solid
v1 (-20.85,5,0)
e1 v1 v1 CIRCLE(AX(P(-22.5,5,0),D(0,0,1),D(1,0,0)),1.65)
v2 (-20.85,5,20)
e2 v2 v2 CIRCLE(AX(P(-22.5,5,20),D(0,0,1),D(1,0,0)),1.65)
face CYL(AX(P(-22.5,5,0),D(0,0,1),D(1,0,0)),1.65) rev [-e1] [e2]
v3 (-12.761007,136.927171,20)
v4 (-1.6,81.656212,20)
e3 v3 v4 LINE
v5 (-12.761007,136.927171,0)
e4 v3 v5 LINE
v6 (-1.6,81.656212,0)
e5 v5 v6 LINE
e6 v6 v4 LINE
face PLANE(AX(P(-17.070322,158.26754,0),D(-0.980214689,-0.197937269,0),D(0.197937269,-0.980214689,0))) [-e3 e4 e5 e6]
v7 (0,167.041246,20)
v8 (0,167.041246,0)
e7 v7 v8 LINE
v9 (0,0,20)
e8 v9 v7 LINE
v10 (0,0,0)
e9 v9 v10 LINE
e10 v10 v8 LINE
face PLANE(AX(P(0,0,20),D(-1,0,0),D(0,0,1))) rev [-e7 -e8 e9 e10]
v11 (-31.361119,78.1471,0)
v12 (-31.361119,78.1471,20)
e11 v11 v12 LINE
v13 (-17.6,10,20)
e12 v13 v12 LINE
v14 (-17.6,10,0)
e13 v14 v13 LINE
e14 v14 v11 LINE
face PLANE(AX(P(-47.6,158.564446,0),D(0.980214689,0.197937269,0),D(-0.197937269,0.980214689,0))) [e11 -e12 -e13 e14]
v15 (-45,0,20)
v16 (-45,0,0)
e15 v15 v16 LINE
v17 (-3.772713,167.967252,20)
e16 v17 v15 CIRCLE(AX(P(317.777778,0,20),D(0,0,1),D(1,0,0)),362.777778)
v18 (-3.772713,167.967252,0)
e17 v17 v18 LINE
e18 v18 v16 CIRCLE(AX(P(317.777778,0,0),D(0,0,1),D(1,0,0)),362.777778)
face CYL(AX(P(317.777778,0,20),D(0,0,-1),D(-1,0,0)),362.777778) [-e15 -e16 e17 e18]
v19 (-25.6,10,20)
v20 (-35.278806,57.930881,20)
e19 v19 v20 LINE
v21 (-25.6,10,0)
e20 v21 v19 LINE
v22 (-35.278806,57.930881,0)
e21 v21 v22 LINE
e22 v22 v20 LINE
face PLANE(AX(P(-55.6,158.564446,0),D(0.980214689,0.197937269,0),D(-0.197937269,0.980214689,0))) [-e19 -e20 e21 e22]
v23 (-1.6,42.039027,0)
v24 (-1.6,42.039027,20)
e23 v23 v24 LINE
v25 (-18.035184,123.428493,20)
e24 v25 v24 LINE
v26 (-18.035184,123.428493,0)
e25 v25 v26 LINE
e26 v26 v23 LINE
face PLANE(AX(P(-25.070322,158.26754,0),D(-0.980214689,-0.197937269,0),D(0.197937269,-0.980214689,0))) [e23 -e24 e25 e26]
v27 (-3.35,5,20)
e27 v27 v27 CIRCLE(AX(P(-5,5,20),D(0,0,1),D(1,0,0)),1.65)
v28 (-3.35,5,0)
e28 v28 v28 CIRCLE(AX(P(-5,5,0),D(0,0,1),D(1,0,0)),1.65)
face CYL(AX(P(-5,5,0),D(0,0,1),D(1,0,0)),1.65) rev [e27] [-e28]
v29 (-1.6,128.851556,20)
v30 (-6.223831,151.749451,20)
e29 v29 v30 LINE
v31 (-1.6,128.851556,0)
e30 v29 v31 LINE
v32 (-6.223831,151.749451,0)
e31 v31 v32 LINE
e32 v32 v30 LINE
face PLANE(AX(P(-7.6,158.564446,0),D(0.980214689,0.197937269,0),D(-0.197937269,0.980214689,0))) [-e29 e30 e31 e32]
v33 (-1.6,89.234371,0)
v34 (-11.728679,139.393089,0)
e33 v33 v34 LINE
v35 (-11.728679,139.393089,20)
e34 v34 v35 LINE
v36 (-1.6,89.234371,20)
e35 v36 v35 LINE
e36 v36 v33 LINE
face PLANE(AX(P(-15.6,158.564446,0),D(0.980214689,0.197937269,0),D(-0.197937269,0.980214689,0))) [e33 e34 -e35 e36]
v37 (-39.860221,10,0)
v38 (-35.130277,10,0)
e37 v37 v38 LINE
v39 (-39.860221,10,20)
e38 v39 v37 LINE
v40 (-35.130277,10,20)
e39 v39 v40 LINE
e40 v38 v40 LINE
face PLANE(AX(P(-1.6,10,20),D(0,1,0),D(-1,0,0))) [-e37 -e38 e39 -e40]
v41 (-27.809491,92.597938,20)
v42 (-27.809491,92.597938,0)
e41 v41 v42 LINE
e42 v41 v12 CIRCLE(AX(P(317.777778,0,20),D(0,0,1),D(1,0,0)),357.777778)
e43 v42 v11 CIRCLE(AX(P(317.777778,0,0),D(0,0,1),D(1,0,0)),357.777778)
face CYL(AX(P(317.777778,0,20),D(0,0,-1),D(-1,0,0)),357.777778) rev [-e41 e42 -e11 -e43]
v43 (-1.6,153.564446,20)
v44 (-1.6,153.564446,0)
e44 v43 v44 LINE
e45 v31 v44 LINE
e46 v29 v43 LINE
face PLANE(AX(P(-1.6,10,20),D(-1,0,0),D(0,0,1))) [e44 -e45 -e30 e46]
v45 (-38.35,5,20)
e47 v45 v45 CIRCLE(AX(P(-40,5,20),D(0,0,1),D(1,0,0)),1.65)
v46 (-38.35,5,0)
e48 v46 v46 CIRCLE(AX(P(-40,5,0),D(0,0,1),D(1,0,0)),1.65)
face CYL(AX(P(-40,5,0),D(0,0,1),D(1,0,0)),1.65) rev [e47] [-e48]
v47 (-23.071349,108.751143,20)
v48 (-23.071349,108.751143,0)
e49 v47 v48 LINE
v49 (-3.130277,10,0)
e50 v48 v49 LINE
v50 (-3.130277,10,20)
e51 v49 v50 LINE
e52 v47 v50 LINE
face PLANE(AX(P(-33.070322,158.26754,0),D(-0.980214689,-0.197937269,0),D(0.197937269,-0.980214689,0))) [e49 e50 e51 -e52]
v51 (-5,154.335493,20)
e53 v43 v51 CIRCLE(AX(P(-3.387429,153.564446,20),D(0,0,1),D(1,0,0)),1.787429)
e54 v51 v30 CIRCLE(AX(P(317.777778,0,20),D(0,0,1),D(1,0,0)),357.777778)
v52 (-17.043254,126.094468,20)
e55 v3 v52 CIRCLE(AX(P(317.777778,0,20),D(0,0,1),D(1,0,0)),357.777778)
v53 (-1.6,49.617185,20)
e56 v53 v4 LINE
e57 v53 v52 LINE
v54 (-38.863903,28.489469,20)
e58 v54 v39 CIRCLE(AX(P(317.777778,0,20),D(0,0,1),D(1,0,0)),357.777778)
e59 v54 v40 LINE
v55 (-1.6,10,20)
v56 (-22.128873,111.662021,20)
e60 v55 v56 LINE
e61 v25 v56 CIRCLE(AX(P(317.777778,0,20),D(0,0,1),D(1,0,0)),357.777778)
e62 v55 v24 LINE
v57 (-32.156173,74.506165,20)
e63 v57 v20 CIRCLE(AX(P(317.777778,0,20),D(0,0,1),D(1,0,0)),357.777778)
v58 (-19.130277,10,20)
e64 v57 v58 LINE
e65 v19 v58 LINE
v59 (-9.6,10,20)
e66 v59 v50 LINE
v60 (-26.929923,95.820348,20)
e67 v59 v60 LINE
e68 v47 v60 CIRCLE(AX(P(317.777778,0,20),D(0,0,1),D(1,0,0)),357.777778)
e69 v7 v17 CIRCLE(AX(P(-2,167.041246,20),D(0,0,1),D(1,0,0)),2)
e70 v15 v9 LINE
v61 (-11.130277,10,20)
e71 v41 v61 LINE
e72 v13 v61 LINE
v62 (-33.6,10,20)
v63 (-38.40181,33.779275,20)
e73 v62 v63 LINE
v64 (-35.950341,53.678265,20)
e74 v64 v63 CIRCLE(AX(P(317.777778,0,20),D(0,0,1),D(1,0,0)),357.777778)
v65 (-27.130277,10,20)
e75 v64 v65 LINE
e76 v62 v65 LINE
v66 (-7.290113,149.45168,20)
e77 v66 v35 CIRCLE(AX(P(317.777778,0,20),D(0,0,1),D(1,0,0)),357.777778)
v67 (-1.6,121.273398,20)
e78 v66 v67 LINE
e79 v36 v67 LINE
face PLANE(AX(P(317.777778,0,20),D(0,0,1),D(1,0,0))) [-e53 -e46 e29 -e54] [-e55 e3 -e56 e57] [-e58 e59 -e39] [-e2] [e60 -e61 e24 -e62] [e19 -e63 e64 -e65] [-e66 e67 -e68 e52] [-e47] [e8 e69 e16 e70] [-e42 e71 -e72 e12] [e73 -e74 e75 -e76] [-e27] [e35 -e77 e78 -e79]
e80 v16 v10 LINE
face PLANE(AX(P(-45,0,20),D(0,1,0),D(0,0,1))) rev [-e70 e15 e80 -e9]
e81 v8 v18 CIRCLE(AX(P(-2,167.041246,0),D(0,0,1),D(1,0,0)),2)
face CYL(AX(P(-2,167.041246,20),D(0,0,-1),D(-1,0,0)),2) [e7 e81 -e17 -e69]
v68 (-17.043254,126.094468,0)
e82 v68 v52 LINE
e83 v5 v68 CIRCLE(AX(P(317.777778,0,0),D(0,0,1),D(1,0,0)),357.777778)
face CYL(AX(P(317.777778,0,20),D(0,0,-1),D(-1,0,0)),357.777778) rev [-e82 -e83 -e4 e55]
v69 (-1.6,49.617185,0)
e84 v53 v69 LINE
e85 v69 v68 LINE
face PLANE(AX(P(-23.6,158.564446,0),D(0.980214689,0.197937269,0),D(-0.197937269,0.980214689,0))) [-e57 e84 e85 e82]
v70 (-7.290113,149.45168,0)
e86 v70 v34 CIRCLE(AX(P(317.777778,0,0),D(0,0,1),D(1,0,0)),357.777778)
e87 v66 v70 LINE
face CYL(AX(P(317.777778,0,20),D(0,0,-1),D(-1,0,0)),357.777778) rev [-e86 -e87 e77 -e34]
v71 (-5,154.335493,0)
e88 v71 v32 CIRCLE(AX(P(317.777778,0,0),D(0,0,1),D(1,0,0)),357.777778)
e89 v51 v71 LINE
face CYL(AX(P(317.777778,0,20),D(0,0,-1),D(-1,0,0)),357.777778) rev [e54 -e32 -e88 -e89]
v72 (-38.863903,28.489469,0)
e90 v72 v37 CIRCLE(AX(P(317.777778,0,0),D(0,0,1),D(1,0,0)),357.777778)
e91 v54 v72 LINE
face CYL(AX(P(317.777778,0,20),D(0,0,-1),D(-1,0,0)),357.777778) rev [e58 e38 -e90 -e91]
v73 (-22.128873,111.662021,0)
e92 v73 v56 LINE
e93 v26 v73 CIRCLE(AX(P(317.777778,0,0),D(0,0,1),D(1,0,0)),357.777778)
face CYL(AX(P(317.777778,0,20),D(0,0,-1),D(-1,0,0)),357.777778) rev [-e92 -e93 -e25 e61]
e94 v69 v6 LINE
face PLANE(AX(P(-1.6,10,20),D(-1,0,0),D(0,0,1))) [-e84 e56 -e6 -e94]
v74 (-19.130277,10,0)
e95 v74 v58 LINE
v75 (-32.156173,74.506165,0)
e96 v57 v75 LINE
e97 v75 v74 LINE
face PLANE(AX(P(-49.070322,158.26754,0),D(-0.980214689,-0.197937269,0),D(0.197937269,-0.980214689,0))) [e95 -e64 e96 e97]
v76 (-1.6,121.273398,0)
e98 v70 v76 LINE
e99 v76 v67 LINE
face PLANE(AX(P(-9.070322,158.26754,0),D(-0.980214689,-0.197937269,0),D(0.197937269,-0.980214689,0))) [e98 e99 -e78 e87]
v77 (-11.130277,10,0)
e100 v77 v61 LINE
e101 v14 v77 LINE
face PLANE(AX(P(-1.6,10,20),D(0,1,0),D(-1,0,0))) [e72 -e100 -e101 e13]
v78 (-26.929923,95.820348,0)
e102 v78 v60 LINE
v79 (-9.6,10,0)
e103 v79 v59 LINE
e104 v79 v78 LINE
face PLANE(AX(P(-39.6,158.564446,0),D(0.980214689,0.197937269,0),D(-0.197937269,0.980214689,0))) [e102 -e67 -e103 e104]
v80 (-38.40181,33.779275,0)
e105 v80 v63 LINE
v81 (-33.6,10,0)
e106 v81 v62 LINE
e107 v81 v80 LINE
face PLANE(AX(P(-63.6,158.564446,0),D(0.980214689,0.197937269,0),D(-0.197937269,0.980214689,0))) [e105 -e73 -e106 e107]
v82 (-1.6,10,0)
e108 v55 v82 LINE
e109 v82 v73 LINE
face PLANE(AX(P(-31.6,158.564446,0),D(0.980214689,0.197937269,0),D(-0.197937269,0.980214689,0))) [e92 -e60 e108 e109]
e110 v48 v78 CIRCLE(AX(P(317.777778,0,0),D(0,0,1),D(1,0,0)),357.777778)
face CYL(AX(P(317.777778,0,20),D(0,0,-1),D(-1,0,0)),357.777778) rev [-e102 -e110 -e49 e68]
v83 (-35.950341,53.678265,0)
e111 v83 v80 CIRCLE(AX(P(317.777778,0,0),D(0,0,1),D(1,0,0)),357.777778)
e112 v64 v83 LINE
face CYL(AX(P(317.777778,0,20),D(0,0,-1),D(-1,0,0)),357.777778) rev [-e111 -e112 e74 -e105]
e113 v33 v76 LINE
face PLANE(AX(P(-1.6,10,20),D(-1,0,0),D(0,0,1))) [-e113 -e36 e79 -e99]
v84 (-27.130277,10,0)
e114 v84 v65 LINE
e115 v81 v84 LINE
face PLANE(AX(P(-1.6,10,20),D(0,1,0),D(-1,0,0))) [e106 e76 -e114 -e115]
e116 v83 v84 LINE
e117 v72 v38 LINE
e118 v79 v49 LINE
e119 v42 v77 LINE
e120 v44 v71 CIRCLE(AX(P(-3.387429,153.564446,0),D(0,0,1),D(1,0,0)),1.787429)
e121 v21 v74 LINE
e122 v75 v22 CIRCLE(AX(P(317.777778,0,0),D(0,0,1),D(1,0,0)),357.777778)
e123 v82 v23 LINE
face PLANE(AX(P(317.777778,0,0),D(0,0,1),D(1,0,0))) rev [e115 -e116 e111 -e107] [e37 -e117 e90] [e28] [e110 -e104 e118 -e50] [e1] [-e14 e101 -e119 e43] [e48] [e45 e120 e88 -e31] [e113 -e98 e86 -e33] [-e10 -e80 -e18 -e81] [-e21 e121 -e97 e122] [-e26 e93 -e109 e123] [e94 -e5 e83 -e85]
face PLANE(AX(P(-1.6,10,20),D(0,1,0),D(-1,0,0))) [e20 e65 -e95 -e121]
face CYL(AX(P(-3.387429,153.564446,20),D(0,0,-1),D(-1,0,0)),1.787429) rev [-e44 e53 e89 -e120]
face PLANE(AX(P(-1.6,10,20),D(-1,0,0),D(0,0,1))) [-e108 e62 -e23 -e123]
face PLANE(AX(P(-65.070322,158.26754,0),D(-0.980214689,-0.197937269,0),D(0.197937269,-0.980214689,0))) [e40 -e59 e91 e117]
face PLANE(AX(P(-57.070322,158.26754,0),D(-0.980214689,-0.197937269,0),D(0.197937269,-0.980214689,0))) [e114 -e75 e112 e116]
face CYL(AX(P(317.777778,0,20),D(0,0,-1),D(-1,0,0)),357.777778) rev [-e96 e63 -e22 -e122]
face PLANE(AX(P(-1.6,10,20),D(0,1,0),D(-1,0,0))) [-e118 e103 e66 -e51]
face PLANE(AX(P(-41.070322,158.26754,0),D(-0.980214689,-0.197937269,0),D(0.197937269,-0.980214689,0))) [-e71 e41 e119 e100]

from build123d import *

# Parameters (mm, degrees)
BOSS_EXTRUDE4_DEPTH = 20
SKETCH12_R          = 1.65
CUT_EXTRUDE1_DEPTH  = 177.068006068
BOSS_EXTRUDE5_DEPTH = 20
CUT_EXTRUDE2_START  = -20
CUT_EXTRUDE2_DEPTH  = 20
LPATTERN2_DEPTH     = 20
CUT_EXTRUDE4_START  = -30
CUT_EXTRUDE4_DEPTH  = 30


with BuildPart() as part:
    # Sketch5 → Boss-Extrude4 (new body)
    with BuildSketch(Plane.XY):
        with BuildLine():
            Line((0, 0), (0, 167.041245738))
            ThreePointArc((0, 167.041245738), (-1.523254023, 168.9835931), (-3.772713274, 167.967252028))
            ThreePointArc((-3.772713274, 167.967252028), (-34.542452011, 86.476422979), (-45, 0))
            Line((-45, 0), (0, 0))
        make_face()
        with BuildLine():
            Line((-1.6, 10), (-39.860221142, 10))
            ThreePointArc((-39.860221142, 10), (-30.000299364, 83.996114978), (-5, 154.335493145))
            ThreePointArc((-5, 154.335493145), (-2.992115624, 155.307611869), (-1.6, 153.56444562))
            Line((-1.6, 153.56444562), (-1.6, 10))
        make_face(mode=Mode.SUBTRACT)
    extrude(amount=BOSS_EXTRUDE4_DEPTH)

    # Sketch12 → Cut-Extrude1 (cut, through all)
    with BuildSketch(Plane.XY.offset(20)):
        with Locations((-40, 5)):
            Circle(SKETCH12_R)
        with Locations((-22.5, 5)):
            Circle(SKETCH12_R)
        with Locations((-5, 5)):
            Circle(SKETCH12_R)
    extrude(amount=-CUT_EXTRUDE1_DEPTH, mode=Mode.SUBTRACT)

    # Sketch14 → Boss-Extrude5 (add)
    with BuildSketch(Plane.XY.offset(20)):
        Polygon((-31.6, 158.56444562), (-1.6, 10), (-3.070322034, 9.703094096), (-33.070322034, 158.267539717), align=None)
    extrude(amount=-BOSS_EXTRUDE5_DEPTH)

    # Sketch17 → Cut-Extrude2 (cut)
    with BuildSketch(Plane.XY.offset(20).offset(CUT_EXTRUDE2_START)):
        Polygon((-120.638203698, 868.825955305), (-109.129206393, -31.174044695), (790.870793607, -19.66504739), (784.13367644, 507.175413991), align=None)
        with BuildLine():
            Line((-45, 0), (0, 0))
            Line((0, 0), (0, 167.041245738))
            ThreePointArc((0, 167.041245738), (-1.523254023, 168.9835931), (-3.772713274, 167.967252028))
            ThreePointArc((-3.772713274, 167.967252028), (-34.542452011, 86.476422979), (-45, 0))
        make_face(mode=Mode.SUBTRACT)
    extrude(amount=CUT_EXTRUDE2_DEPTH, mode=Mode.SUBTRACT)

    # LPattern2: read off the stored shape, not the designer's step
    # LPattern2 outline → LPattern2 (add)
    with BuildSketch(Plane.XY):
        with BuildLine():
            ThreePointArc((-26.929923269, 95.820348103), (-27.373467662, 94.210169532), (-27.809490726, 92.59793799))
            Line((-27.809490726, 92.59793799), (-11.130277006, 10))
            Line((-11.130277006, 10), (-9.6, 10))
            Line((-9.6, 10), (-26.929923269, 95.820348103))
        make_face()
        with BuildLine():
            Line((-17.6, 10), (-31.361118804, 78.147099536))
            ThreePointArc((-31.361118804, 78.147099536), (-31.763386373, 76.327667567), (-32.156172589, 74.506165199))
            Line((-32.156172589, 74.506165199), (-19.130277006, 10))
            Line((-19.130277006, 10), (-17.6, 10))
        make_face()
        with BuildLine():
            Line((-25.6, 10), (-35.278805908, 57.930881129))
            ThreePointArc((-35.278805908, 57.930881129), (-35.62097033, 55.805583127), (-35.950341194, 53.67826488))
            Line((-35.950341194, 53.67826488), (-27.130277006, 10))
            Line((-27.130277006, 10), (-25.6, 10))
        make_face()
        with BuildLine():
            Line((-33.6, 10), (-38.401810118, 33.779275272))
            ThreePointArc((-38.401810118, 33.779275272), (-38.642670237, 31.135229386), (-38.863902948, 28.489468942))
            Line((-38.863902948, 28.489468942), (-35.130277006, 10))
            Line((-35.130277006, 10), (-33.6, 10))
        make_face()
        with BuildLine():
            Line((-39.6, 158.56444562), (-41.070322034, 158.267539717))
            Line((-41.070322034, 158.267539717), (-29.975183074, 103.322767425))
            ThreePointArc((-29.975183074, 103.322767425), (-29.520039112, 104.842464839), (-29.058254032, 106.360157429))
            Line((-29.058254032, 106.360157429), (-39.6, 158.56444562))
        make_face()
        with BuildLine():
            Line((-9.070322034, 158.267539717), (-8.948336076, 157.663447176))
            ThreePointArc((-8.948336076, 157.663447176), (-8.779938618, 158.011942308), (-8.611169445, 158.360257578))
            Line((-8.611169445, 158.360257578), (-9.070322034, 158.267539717))
        make_face()
        with BuildLine():
            Line((-17.070322034, 158.267539717), (-14.508363766, 145.580342723))
            ThreePointArc((-14.508363766, 145.580342723), (-13.985146964, 146.768790335), (-13.457679601, 147.955357539))
            Line((-13.457679601, 147.955357539), (-15.6, 158.56444562))
            Line((-15.6, 158.56444562), (-17.070322034, 158.267539717))
        make_face()
        with BuildLine():
            Line((-25.070322034, 158.267539717), (-19.890886638, 132.618208106))
            ThreePointArc((-19.890886638, 132.618208106), (-19.386082828, 133.896404549), (-18.876440608, 135.172679536))
            Line((-18.876440608, 135.172679536), (-23.6, 158.56444562))
            Line((-23.6, 158.56444562), (-25.070322034, 158.267539717))
        make_face()
        with BuildLine():
            ThreePointArc((-42.198101589, 45.000914697), (-41.903670312, 47.296637828), (-41.594598358, 49.590435769))
            Line((-41.594598358, 49.590435769), (-63.6, 158.56444562))
            Line((-63.6, 158.56444562), (-65.070322034, 158.267539717))
            Line((-65.070322034, 158.267539717), (-42.198101589, 45.000914697))
        make_face()
        with BuildLine():
            ThreePointArc((-38.7019538, 67.304658261), (-38.331864724, 69.236107391), (-37.951310909, 71.165521929))
            Line((-37.951310909, 71.165521929), (-55.6, 158.56444562))
            Line((-55.6, 158.56444562), (-57.070322034, 158.267539717))
            Line((-57.070322034, 158.267539717), (-38.7019538, 67.304658261))
        make_face()
        with BuildLine():
            ThreePointArc((-34.559404558, 86.407326039), (-34.139952511, 88.100097378), (-33.712367751, 89.79083275))
            Line((-33.712367751, 89.79083275), (-47.6, 158.56444562))
            Line((-47.6, 158.56444562), (-49.070322034, 158.267539717))
            Line((-49.070322034, 158.267539717), (-34.559404558, 86.407326039))
        make_face()
        with BuildLine():
            ThreePointArc((-17.043254073, 126.094468165), (-17.541868523, 124.762466617), (-18.035183962, 123.428493465))
            Line((-18.035183962, 123.428493465), (-1.6, 42.039026998))
            Line((-1.6, 42.039026998), (-1.6, 49.617185499))
            Line((-1.6, 49.617185499), (-17.043254073, 126.094468165))
        make_face()
        with BuildLine():
            ThreePointArc((-11.728678792, 139.39308932), (-12.247145872, 138.161094529), (-12.761006653, 136.927171366))
            Line((-12.761006653, 136.927171366), (-1.6, 81.656212497))
            Line((-1.6, 81.656212497), (-1.6, 89.234370998))
            Line((-1.6, 89.234370998), (-11.728678792, 139.39308932))
        make_face()
        with BuildLine():
            ThreePointArc((-6.2238307, 151.749451318), (-6.759005375, 150.601509463), (-7.290112892, 149.451680241))
            Line((-7.290112892, 149.451680241), (-1.6, 121.273397996))
            Line((-1.6, 121.273397996), (-1.6, 128.851556496))
            Line((-1.6, 128.851556496), (-6.2238307, 151.749451318))
        make_face()
        Polygon((0, 41.693748399), (0, 34.115589899), (4.929677966, 9.703094096), (6.4, 10), align=None)
        Polygon((0, 158.483672593), (0, 152.967146395), (28.929677966, 9.703094096), (30.4, 10), (0.4, 158.56444562), align=None)
        Polygon((0, 120.928119397), (0, 113.349960896), (20.929677966, 9.703094096), (22.4, 10), align=None)
        Polygon((0, 81.310933898), (0, 73.732775397), (12.929677966, 9.703094096), (14.4, 10), align=None)
    extrude(amount=LPATTERN2_DEPTH)

    # Sketch19 → Cut-Extrude4 (cut)
    with BuildSketch(Plane.XY.offset(20).offset(CUT_EXTRUDE4_START)):
        Polygon((-113.909990018, -19.131609845), (183.246695872, -29.17634289), (134.697152825, 220.267861041), (-171.248674479, 235.334960607), align=None)
        with BuildLine():
            Line((-45, 0), (0, 0))
            Line((0, 0), (0, 167.041245738))
            ThreePointArc((0, 167.041245738), (-1.523254023, 168.9835931), (-3.772713274, 167.967252028))
            ThreePointArc((-3.772713274, 167.967252028), (-34.542452011, 86.476422979), (-45, 0))
        make_face(mode=Mode.SUBTRACT)
    extrude(amount=CUT_EXTRUDE4_DEPTH, mode=Mode.SUBTRACT)


solid = part.part
